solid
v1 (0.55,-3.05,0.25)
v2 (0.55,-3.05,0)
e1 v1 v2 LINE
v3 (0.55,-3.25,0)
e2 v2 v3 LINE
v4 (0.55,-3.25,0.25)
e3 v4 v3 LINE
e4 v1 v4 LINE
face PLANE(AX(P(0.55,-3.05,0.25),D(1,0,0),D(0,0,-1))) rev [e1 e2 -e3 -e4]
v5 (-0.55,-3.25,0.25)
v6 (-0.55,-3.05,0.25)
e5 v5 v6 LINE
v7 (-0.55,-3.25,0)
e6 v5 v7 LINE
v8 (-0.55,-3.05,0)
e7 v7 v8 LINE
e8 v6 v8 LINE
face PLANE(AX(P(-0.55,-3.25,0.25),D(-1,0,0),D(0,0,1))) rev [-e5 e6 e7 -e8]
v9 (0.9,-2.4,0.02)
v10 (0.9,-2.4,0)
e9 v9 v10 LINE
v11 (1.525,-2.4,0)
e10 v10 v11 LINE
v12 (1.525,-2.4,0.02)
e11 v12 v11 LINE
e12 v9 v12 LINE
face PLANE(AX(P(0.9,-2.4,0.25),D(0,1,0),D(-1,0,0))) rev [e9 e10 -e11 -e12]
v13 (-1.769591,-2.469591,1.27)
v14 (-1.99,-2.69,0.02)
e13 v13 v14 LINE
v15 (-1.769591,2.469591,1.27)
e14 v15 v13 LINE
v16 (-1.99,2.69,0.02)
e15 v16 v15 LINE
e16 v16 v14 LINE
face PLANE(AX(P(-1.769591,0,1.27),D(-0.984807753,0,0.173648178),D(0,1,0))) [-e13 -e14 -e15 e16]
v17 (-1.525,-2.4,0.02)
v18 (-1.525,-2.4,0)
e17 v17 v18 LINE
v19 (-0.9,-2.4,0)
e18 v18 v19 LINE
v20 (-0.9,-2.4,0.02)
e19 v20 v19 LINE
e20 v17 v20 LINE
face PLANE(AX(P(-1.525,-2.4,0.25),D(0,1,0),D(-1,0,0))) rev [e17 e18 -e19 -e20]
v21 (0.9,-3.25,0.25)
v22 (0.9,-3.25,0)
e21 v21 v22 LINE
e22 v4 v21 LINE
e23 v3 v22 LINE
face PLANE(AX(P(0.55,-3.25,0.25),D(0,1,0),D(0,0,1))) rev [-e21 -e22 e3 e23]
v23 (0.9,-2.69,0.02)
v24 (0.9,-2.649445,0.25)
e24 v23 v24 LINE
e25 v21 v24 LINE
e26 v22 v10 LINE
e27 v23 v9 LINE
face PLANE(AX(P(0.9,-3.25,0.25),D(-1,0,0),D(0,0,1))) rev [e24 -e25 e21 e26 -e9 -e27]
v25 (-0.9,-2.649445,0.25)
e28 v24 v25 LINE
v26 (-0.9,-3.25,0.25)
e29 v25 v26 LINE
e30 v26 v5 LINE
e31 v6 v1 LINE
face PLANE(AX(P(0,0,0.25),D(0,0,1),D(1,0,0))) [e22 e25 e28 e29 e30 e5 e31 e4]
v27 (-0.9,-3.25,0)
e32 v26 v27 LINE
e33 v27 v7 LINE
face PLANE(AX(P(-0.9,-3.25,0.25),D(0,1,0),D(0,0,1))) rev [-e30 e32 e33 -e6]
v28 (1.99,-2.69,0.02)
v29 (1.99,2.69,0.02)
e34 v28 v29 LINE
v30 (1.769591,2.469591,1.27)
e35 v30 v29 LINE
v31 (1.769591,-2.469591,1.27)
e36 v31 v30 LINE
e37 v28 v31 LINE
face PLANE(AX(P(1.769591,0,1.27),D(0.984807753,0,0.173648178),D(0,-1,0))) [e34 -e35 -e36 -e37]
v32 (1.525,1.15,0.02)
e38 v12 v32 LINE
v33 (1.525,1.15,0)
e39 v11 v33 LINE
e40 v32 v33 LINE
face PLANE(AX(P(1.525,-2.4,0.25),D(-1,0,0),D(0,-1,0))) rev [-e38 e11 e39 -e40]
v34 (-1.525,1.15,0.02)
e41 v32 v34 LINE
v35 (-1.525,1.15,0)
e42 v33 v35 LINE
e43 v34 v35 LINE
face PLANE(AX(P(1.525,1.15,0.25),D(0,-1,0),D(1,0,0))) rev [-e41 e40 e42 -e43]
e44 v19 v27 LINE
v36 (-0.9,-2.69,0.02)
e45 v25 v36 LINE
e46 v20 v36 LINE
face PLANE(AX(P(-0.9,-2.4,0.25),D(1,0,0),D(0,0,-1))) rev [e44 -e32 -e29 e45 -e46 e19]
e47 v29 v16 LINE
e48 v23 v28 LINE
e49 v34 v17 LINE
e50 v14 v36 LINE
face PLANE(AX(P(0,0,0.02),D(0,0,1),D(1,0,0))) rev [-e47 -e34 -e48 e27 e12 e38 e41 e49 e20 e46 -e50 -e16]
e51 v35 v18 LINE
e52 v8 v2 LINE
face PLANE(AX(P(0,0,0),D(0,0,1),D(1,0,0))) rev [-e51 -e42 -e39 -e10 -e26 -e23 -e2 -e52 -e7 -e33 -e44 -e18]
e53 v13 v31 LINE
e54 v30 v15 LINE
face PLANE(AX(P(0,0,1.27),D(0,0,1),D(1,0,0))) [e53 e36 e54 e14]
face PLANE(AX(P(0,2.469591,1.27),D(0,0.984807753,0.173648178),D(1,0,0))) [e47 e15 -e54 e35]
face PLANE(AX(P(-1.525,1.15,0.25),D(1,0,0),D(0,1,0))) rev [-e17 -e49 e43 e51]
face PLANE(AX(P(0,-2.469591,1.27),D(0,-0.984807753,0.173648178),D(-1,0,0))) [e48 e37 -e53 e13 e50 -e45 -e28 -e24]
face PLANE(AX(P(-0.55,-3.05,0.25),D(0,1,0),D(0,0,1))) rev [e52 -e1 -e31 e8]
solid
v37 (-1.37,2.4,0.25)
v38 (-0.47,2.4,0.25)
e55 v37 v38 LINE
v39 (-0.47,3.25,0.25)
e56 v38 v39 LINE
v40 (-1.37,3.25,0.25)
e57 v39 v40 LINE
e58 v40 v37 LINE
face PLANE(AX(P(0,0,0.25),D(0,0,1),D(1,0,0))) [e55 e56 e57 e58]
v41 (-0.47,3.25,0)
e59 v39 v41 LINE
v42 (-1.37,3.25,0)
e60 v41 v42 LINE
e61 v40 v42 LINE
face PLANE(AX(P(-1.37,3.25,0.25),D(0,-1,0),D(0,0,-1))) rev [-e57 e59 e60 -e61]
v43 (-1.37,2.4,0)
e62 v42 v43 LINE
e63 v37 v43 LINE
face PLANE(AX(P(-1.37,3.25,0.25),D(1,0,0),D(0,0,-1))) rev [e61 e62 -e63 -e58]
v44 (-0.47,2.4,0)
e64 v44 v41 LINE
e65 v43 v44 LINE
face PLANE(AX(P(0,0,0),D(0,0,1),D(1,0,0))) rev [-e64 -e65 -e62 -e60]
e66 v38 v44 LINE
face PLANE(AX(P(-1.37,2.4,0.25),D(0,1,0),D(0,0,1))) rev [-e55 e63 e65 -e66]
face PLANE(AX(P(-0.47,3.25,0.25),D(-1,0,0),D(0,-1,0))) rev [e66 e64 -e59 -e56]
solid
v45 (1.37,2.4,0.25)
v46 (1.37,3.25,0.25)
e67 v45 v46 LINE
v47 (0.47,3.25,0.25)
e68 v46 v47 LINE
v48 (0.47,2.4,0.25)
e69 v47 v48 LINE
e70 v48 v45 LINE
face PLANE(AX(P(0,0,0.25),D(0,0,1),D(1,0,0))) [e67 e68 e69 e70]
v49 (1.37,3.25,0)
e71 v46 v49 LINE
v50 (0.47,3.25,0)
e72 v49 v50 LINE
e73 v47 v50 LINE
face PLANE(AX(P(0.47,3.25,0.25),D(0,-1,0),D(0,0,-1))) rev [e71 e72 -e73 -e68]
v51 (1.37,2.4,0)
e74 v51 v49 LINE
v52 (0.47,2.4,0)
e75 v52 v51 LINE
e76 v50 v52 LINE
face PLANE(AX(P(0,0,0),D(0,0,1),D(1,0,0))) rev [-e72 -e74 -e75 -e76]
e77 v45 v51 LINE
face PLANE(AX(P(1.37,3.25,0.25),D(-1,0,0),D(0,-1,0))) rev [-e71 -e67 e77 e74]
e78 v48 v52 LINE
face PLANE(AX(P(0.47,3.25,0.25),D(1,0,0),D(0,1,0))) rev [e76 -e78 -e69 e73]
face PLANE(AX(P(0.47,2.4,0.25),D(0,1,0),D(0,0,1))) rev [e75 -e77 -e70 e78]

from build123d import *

# Parameters (mm, degrees)
BOSS_EXTRUDE1_DEPTH   = 0.25
SKETCH2_W             = 0.9
SKETCH2_H             = 0.85
BOSS_EXTRUDE1_2_DEPTH = 0.25
BOSS_EXTRUDE1_3_DEPTH = 0.25
SKETCH3_W             = 3.98
SKETCH3_H             = 5.38
BOSS_EXTRUDE2_DEPTH   = 1.25
CHAMFER6_SIZE         = 1.25
CHAMFER6_SIZE_2       = 0.220408726
CHAMFER7_SIZE         = 1.25
CHAMFER7_SIZE_2       = 0.220408726
CHAMFER8_SIZE         = 1.25
CHAMFER8_SIZE_2       = 0.220408726


with BuildPart() as part:
    # Sketch2 → Boss-Extrude1 (new body)
    with BuildSketch(Plane.XY):
        Polygon((-1.525, 1.15), (-1.525, -2.4), (-0.9, -2.4), (-0.9, -3.25), (-0.55, -3.25), (-0.55, -3.05), (0.55, -3.05), (0.55, -3.25), (0.9, -3.25), (0.9, -2.4), (1.525, -2.4), (1.525, 1.15), align=None)
    extrude(amount=BOSS_EXTRUDE1_DEPTH)

    # Sketch3 → Boss-Extrude2 (add)
    with BuildSketch(Plane.XY.offset(0.02)):
        Rectangle(SKETCH3_W, SKETCH3_H)
    extrude(amount=BOSS_EXTRUDE2_DEPTH)

    # Chamfer6
    # the kernel refuses this chamfer: 1.25, 0.220408726 mm, written as the material it takes off along each edge
    with BuildSketch(Plane(origin=(5.238173496, -2.69, 1.27), x_dir=(0, -0.006682531656101757, -0.9999776716360547), z_dir=(-1, 0, 0))) as chamfer6_piece_1_section:
        Polygon((CHAMFER6_SIZE * 0.999977671636, -CHAMFER6_SIZE * 0.0066825316561), (-CHAMFER6_SIZE_2 * 0.00668253165263, -CHAMFER6_SIZE_2 * 0.999977671117), (0, 0), align=None)
    chamfer6_piece_1 = extrude(amount=10.476346991, mode=Mode.PRIVATE)
    chamfer6_piece_1 = split(chamfer6_piece_1, bisect_by=Plane(origin=(0.9, -2.695482191, 0.132342406), z_dir=(1, 0, 0)), keep=Keep.TOP, mode=Mode.PRIVATE)
    chamfer6_piece_1 = split(chamfer6_piece_1, bisect_by=Plane(origin=(3.069086748, -2.695482191, 0.25), z_dir=(0, 0, -1)), keep=Keep.TOP, mode=Mode.PRIVATE)
    add(chamfer6_piece_1, mode=Mode.SUBTRACT)
    with BuildSketch(Plane(origin=(5.238173496, -2.69, 1.27), x_dir=(0, -0.006682531656101757, -0.9999776716360547), z_dir=(-1, 0, 0))) as chamfer6_piece_2_section:
        Polygon((CHAMFER6_SIZE * 0.999977671636, -CHAMFER6_SIZE * 0.0066825316561), (-CHAMFER6_SIZE_2 * 0.00668253165263, -CHAMFER6_SIZE_2 * 0.999977671117), (0, 0), align=None)
    chamfer6_piece_2 = extrude(amount=10.476346991, mode=Mode.PRIVATE)
    chamfer6_piece_2 = split(chamfer6_piece_2, bisect_by=Plane(origin=(0.9, -2.625359241, 0.876081369), z_dir=(1, 0, 0)), keep=Keep.TOP, mode=Mode.PRIVATE)
    chamfer6_piece_2 = split(chamfer6_piece_2, bisect_by=Plane(origin=(3.069086748, -2.625359241, 0.25), z_dir=(0, 0, 1)), keep=Keep.TOP, mode=Mode.PRIVATE)
    add(chamfer6_piece_2, mode=Mode.SUBTRACT)
    with BuildSketch(Plane(origin=(5.238173496, -2.69, 1.27), x_dir=(0, -0.006682531656101757, -0.9999776716360547), z_dir=(-1, 0, 0))) as chamfer6_piece_3_section:
        Polygon((CHAMFER6_SIZE * 0.999977671636, -CHAMFER6_SIZE * 0.0066825316561), (-CHAMFER6_SIZE_2 * 0.00668253165263, -CHAMFER6_SIZE_2 * 0.999977671117), (0, 0), align=None)
    chamfer6_piece_3 = extrude(amount=10.476346991, mode=Mode.PRIVATE)
    chamfer6_piece_3 = split(chamfer6_piece_3, bisect_by=Plane(origin=(-0.9, -2.625359241, 0.876081369), z_dir=(1, 0, 0)), keep=Keep.TOP, mode=Mode.PRIVATE)
    chamfer6_piece_3 = split(chamfer6_piece_3, bisect_by=Plane(origin=(0.9, -2.625359241, 0.876081369), z_dir=(-1, 0, 0)), keep=Keep.TOP, mode=Mode.PRIVATE)
    chamfer6_piece_3 = split(chamfer6_piece_3, bisect_by=Plane(origin=(0, -2.625359241, 0.25), z_dir=(0, 0, 1)), keep=Keep.TOP, mode=Mode.PRIVATE)
    add(chamfer6_piece_3, mode=Mode.SUBTRACT)
    with BuildSketch(Plane(origin=(5.238173496, -2.69, 1.27), x_dir=(0, -0.006682531656101757, -0.9999776716360547), z_dir=(-1, 0, 0))) as chamfer6_piece_4_section:
        Polygon((CHAMFER6_SIZE * 0.999977671636, -CHAMFER6_SIZE * 0.0066825316561), (-CHAMFER6_SIZE_2 * 0.00668253165263, -CHAMFER6_SIZE_2 * 0.999977671117), (0, 0), align=None)
    chamfer6_piece_4 = extrude(amount=10.476346991, mode=Mode.PRIVATE)
    chamfer6_piece_4 = split(chamfer6_piece_4, bisect_by=Plane(origin=(-0.9, -2.695482191, 0.132342406), z_dir=(-1, 0, 0)), keep=Keep.TOP, mode=Mode.PRIVATE)
    chamfer6_piece_4 = split(chamfer6_piece_4, bisect_by=Plane(origin=(-3.069086748, -2.695482191, 0.25), z_dir=(0, 0, -1)), keep=Keep.TOP, mode=Mode.PRIVATE)
    add(chamfer6_piece_4, mode=Mode.SUBTRACT)
    with BuildSketch(Plane(origin=(5.238173496, -2.69, 1.27), x_dir=(0, -0.006682531656101757, -0.9999776716360547), z_dir=(-1, 0, 0))) as chamfer6_piece_5_section:
        Polygon((CHAMFER6_SIZE * 0.999977671636, -CHAMFER6_SIZE * 0.0066825316561), (-CHAMFER6_SIZE_2 * 0.00668253165263, -CHAMFER6_SIZE_2 * 0.999977671117), (0, 0), align=None)
    chamfer6_piece_5 = extrude(amount=10.476346991, mode=Mode.PRIVATE)
    chamfer6_piece_5 = split(chamfer6_piece_5, bisect_by=Plane(origin=(-0.9, -2.625359241, 0.876081369), z_dir=(-1, 0, 0)), keep=Keep.TOP, mode=Mode.PRIVATE)
    chamfer6_piece_5 = split(chamfer6_piece_5, bisect_by=Plane(origin=(-3.069086748, -2.625359241, 0.25), z_dir=(0, 0, 1)), keep=Keep.TOP, mode=Mode.PRIVATE)
    add(chamfer6_piece_5, mode=Mode.SUBTRACT)

    # Chamfer7
    # the kernel refuses this chamfer: 1.25, 0.220408726 mm, written as the material it takes off along each edge
    with BuildSketch(Plane(origin=(-5.238173496, 2.69, 1.27), x_dir=(0, 0.006682531656101757, -0.9999776716360547), z_dir=(1, 0, 0))) as chamfer7_piece_1:
        Polygon((CHAMFER7_SIZE * 0.999977671636, -CHAMFER7_SIZE * 0.0066825316561), (-CHAMFER7_SIZE_2 * 0.00668253165263, -CHAMFER7_SIZE_2 * 0.999977671117), (0, 0), align=None)
    extrude(amount=10.476346991, mode=Mode.SUBTRACT)

    # Chamfer8
    # the kernel refuses this chamfer: 1.25, 0.220408726 mm, written as the material it takes off along each edge
    with BuildSketch(Plane(origin=(-1.99, -5.71776477, 1.27), x_dir=(-0.006682531656101757, 0, -0.9999776716360547), z_dir=(0, 1, 0)), Plane(origin=(1.99, 5.71776477, 1.27), x_dir=(0.006682531656101757, 0, -0.9999776716360547), z_dir=(0, -1, 0))) as chamfer8_piece_1:
        Polygon((CHAMFER8_SIZE * 0.999977671636, -CHAMFER8_SIZE * 0.0066825316561), (-CHAMFER8_SIZE_2 * 0.00668253165263, -CHAMFER8_SIZE_2 * 0.999977671117), (0, 0), align=None)
    extrude(amount=11.435529539, mode=Mode.SUBTRACT)


with BuildPart() as body_2:
    # Sketch2 → Boss-Extrude1 2 (new body)
    with BuildSketch(Plane.XY):
        with Locations((-0.92, 2.825)):
            Rectangle(SKETCH2_W, SKETCH2_H)
    extrude(amount=BOSS_EXTRUDE1_2_DEPTH)


with BuildPart() as body_3:
    # Sketch2 → Boss-Extrude1 3 (new body)
    with BuildSketch(Plane.XY):
        with Locations((0.92, 2.825)):
            Rectangle(SKETCH2_W, SKETCH2_H)
    extrude(amount=BOSS_EXTRUDE1_3_DEPTH)


solid = Compound([part.part, body_2.part, body_3.part])
